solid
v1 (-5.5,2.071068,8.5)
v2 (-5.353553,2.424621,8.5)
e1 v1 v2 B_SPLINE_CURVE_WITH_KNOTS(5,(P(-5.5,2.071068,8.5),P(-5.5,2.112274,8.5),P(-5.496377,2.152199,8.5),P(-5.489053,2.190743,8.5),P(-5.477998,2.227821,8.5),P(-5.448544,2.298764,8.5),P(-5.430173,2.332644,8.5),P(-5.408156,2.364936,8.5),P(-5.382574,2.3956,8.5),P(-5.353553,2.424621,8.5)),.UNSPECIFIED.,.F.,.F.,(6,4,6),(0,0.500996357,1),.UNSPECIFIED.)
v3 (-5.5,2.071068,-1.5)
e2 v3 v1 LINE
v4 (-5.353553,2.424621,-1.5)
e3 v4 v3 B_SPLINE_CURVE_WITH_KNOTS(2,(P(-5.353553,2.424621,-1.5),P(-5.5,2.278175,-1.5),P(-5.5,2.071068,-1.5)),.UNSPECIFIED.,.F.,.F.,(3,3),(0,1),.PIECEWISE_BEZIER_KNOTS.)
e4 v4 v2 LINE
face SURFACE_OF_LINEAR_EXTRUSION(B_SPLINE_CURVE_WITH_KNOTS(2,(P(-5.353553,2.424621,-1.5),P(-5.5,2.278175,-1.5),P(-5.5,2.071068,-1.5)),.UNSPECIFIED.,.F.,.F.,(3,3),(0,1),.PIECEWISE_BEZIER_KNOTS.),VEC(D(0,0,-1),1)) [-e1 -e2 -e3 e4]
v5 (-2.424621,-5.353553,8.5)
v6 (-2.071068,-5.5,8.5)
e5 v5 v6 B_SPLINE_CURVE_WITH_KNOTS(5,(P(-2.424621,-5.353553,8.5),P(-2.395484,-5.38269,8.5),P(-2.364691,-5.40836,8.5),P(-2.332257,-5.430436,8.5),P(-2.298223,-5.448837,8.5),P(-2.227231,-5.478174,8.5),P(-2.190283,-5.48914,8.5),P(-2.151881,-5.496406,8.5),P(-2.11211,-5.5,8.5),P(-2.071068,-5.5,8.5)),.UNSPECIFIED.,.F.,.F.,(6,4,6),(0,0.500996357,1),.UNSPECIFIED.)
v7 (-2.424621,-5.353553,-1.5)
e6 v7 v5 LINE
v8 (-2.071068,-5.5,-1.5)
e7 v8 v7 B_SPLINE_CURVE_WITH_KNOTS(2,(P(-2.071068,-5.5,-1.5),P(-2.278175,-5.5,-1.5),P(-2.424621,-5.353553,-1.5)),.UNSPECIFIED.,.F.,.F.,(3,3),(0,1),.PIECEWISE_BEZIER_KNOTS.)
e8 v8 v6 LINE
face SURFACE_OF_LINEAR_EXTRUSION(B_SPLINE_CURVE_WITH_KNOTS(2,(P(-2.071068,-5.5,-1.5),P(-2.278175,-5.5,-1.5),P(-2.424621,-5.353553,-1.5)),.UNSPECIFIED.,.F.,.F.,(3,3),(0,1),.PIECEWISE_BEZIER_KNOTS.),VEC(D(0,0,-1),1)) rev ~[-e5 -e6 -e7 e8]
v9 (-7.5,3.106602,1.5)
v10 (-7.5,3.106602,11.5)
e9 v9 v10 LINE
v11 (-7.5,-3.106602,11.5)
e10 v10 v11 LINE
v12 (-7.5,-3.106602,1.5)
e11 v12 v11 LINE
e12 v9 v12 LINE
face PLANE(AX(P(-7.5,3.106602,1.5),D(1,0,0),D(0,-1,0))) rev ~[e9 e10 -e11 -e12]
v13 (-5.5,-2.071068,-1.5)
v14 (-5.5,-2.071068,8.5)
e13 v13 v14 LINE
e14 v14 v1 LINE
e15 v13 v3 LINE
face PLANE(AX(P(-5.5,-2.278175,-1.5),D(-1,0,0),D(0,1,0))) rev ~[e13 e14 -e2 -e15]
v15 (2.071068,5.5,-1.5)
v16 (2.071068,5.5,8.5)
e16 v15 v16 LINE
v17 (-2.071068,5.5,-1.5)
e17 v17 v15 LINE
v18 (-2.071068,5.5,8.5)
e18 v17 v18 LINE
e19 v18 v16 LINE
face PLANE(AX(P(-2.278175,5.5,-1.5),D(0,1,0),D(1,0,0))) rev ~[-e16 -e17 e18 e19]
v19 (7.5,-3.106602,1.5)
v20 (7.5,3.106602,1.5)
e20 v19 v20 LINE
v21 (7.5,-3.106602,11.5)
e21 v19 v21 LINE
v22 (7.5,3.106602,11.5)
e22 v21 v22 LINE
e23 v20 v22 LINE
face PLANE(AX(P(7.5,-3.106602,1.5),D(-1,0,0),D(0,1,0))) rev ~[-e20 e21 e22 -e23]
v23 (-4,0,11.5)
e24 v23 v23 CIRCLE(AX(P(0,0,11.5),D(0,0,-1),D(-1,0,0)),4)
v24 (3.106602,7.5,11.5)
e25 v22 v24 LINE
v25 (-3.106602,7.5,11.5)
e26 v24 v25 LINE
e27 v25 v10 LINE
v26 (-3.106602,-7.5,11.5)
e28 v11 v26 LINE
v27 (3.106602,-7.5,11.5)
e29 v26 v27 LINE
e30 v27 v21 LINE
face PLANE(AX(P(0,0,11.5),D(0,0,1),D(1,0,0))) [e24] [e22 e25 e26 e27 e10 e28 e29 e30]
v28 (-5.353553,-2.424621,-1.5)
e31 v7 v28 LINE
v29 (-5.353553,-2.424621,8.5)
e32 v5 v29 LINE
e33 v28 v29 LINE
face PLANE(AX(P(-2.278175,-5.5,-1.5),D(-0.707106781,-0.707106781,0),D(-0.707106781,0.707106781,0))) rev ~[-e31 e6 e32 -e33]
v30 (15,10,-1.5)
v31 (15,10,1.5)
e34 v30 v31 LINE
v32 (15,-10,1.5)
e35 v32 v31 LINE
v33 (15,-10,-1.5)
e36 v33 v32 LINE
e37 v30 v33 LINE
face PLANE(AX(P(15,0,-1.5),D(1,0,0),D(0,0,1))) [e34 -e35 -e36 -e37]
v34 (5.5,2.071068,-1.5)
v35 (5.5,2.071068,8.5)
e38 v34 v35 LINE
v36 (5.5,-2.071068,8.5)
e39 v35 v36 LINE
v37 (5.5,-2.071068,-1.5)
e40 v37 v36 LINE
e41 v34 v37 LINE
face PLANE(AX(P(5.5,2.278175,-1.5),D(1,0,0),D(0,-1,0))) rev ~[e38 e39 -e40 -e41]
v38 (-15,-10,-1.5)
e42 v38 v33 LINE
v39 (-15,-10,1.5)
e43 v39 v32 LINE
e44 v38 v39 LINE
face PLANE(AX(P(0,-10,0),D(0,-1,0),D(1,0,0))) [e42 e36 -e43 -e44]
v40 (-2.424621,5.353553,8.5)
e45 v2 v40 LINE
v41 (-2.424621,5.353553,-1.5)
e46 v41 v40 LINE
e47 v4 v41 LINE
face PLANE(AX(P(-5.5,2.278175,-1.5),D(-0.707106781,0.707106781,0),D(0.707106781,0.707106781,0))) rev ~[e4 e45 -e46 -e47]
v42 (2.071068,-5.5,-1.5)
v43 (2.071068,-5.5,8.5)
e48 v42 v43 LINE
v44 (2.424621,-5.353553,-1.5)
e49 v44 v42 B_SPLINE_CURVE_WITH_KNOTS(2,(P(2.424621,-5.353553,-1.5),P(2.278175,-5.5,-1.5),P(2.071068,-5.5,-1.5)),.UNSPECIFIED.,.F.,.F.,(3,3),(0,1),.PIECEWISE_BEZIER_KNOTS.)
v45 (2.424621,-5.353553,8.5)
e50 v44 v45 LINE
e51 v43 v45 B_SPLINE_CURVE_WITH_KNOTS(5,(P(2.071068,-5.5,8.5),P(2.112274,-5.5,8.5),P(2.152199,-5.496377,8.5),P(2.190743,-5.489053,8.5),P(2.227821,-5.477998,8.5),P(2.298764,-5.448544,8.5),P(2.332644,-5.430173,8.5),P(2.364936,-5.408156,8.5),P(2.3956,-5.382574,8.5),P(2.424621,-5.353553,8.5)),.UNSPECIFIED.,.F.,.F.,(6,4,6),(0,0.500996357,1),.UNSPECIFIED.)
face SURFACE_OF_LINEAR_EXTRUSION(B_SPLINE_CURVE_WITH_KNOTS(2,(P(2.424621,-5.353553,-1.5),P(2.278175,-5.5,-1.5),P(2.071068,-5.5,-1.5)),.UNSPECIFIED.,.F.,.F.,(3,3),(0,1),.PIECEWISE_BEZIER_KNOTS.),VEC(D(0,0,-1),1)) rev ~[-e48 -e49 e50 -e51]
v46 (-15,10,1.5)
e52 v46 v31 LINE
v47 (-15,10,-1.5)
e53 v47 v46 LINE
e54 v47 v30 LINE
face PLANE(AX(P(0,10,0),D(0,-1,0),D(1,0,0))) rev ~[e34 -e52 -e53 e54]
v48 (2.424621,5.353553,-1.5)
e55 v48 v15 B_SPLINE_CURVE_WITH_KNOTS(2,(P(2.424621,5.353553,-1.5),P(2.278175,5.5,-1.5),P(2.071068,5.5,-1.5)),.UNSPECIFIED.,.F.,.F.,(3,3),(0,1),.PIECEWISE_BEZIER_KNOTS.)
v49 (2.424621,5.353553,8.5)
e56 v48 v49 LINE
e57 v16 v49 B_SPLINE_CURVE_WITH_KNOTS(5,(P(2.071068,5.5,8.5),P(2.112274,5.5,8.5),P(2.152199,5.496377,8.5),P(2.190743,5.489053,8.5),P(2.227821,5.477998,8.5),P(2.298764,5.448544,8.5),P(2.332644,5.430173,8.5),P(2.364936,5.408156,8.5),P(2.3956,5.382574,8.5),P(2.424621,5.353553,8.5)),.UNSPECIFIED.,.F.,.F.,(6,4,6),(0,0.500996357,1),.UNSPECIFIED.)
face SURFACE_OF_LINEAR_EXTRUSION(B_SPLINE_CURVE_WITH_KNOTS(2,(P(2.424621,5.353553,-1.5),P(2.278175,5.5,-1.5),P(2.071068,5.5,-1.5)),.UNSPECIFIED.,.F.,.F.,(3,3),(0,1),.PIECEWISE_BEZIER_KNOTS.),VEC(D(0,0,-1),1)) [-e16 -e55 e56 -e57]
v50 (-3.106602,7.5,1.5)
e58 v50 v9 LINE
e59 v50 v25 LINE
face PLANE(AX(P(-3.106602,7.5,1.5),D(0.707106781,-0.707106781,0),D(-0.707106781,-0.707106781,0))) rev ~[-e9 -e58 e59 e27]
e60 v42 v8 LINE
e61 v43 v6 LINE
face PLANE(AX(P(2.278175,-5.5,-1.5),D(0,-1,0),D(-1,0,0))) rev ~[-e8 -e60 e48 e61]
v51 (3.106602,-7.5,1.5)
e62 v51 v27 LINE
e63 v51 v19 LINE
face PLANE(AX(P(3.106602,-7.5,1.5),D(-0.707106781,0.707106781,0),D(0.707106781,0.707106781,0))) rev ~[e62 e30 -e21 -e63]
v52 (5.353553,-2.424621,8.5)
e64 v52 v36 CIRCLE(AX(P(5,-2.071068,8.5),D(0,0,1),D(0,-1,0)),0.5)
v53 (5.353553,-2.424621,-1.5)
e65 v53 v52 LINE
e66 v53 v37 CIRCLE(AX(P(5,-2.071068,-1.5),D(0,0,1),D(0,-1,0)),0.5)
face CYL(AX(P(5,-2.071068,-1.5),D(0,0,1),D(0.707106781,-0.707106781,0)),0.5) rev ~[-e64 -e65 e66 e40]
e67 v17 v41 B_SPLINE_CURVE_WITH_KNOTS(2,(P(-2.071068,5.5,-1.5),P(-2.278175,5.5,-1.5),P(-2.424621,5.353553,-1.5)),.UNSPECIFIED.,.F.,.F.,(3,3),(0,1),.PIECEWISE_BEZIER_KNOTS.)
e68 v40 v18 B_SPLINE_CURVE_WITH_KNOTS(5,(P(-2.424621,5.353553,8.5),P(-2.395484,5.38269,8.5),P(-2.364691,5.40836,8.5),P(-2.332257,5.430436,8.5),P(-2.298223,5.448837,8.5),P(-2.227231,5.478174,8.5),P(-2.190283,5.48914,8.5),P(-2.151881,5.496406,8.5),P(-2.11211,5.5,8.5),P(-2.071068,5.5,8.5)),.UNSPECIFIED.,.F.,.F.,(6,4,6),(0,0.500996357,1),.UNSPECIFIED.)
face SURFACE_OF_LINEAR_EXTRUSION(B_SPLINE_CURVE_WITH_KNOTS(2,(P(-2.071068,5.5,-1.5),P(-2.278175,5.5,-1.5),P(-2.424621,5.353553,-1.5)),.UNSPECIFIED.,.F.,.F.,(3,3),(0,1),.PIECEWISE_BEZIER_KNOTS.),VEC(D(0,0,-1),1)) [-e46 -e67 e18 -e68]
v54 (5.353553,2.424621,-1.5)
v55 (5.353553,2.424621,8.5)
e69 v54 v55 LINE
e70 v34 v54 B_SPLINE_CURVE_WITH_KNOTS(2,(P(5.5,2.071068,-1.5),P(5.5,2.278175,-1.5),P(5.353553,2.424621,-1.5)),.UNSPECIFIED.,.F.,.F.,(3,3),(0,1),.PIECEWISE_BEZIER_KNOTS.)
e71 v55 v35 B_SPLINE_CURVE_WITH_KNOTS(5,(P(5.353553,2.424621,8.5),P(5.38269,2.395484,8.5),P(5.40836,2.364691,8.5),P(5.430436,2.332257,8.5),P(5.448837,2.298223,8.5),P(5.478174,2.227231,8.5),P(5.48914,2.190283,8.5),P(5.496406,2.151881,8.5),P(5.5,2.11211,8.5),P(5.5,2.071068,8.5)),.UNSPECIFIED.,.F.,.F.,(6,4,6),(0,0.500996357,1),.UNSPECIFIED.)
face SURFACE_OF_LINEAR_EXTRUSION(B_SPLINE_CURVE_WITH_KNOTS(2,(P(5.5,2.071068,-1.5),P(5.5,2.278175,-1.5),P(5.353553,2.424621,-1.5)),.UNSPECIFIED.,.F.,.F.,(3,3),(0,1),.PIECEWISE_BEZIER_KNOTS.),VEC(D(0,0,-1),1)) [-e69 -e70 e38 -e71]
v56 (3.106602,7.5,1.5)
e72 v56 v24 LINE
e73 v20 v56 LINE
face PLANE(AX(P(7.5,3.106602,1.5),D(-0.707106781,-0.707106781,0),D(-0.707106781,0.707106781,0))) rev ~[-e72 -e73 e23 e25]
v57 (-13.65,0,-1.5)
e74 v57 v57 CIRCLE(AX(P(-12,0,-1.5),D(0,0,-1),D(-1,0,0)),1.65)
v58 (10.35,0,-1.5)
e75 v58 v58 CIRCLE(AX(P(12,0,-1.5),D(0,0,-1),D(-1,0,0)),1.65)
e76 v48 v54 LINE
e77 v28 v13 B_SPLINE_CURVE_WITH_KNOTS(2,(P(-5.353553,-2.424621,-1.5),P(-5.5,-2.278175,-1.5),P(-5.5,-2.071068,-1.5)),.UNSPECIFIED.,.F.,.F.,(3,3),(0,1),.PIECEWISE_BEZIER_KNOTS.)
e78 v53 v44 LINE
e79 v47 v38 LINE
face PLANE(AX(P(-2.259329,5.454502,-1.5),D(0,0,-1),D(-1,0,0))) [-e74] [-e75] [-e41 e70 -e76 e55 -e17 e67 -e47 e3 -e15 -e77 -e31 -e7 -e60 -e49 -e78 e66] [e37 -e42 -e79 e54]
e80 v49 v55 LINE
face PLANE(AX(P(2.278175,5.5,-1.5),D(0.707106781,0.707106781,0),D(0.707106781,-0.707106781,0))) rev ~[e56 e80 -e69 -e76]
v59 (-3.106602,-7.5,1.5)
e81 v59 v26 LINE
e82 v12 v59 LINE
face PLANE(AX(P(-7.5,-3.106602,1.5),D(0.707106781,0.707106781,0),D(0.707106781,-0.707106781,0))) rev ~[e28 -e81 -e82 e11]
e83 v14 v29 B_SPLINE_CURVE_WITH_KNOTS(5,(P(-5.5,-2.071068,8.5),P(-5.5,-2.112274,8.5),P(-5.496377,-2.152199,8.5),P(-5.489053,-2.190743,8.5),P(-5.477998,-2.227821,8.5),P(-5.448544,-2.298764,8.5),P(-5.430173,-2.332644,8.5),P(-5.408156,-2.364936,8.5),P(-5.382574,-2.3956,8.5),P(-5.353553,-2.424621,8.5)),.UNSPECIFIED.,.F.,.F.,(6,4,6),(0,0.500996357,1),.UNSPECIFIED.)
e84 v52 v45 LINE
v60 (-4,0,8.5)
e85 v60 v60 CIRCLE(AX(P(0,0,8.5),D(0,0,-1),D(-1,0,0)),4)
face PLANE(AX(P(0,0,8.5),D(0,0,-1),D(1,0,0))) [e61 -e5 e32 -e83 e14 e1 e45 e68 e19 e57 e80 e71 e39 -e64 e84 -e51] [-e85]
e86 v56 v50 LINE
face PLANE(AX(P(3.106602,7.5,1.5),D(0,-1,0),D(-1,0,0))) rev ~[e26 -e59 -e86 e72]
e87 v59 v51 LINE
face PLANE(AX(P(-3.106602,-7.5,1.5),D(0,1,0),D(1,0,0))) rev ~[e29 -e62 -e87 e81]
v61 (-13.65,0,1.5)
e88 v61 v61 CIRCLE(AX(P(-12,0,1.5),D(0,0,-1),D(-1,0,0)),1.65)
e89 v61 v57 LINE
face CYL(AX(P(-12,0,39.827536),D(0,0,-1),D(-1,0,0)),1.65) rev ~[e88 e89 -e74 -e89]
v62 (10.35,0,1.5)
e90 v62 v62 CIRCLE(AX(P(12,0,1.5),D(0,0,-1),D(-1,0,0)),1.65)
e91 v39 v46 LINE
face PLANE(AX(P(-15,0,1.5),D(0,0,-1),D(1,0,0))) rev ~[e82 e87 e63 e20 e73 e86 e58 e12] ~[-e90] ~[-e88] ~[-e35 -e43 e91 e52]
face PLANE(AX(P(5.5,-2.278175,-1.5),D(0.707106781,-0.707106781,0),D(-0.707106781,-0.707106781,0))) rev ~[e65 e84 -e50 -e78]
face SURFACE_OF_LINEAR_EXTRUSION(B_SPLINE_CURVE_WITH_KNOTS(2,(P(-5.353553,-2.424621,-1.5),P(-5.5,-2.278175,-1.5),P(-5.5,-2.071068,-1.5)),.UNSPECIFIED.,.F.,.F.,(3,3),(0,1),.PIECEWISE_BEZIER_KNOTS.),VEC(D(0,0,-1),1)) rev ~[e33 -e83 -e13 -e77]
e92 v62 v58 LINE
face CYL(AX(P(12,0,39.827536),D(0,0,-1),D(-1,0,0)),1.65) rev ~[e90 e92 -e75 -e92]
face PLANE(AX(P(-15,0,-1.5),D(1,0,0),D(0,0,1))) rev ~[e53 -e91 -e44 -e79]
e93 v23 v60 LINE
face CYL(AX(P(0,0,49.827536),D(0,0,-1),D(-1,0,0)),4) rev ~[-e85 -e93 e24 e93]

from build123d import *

# Parameters (mm, degrees)
F0_W         = 30
F0_H         = 3
F1_DEPTH     = 10
F3_DEPTH     = 10
F5_DEPTH     = 10
F7_D         = 8
F8_T1_DEPTH  = 10.517766953
F9_R         = 0.5
F10_T1_DEPTH = 10.517766953
F11_T1_DEPTH = 10.517766953
F12_T1_DEPTH = 10.517766953
F13_T1_DEPTH = 10.517766953
F14_T1_DEPTH = 10.517766953
F15_T1_DEPTH = 10.517766953
F17_D        = 3.3


# Not quite as in the source:
# - a fillet or chamfer that OpenCascade refuses, or shapes differently, is made with other operations: its cross-section is extruded or revolved along the edge and cut away or added
# - a feature names something its author has since deleted; it is built from what else it names


with BuildPart() as f1:
    # F0 (on Front) → F1 (new body, symmetric)
    with BuildSketch(Plane.XZ):
        Rectangle(F0_W, F0_H)
    extrude(amount=F1_DEPTH, both=True)

    # F2 (on face) → F3 (join)
    with BuildSketch(Plane.XY.offset(1.5)):
        Polygon((-3.1066017178, -7.5), (3.1066017178, -7.5), (7.5, -3.1066017178), (7.5, 3.1066017178), (3.1066017178, 7.5), (-3.1066017178, 7.5), (-7.5, 3.1066017178), (-7.5, -3.1066017178), align=None)
    extrude(amount=F3_DEPTH)

    # F4 (on face) → F5 (cut)
    with BuildSketch(Plane(origin=(0, 0, -1.5), x_dir=(1, 0, 0), z_dir=(0, 0, -1))):
        Polygon((-2.2781745931, -5.5), (2.2781745931, -5.5), (5.5, -2.2781745931), (5.5, 2.2781745931), (2.2781745931, 5.5), (-2.2781745931, 5.5), (-5.5, 2.2781745931), (-5.5, -2.2781745931), align=None)
    extrude(amount=-F5_DEPTH, mode=Mode.SUBTRACT)

    # F7 (through all)
    with Locations(Plane.XY.offset(11.5)):
        with Locations((0, 0)):
            Hole(F7_D / 2)

    # F8: fillet of radius 0.5 on 1 edges, made by hand

    # F8_s2 → F8_t1 (join)
    with BuildSketch(Plane.XY.offset(-1.5)):
        with BuildLine():
            add(Edge.make_bspline(
                [(2.4246212025, -5.3535533906), (2.2781745931, -5.5), (2.0710678119, -5.5)],
                knots=[0, 0, 0, 1, 1, 1], degree=2, weights=[1, 1, 1]))
            Line((2.0710678119, -5.5), (2.2781745931, -5.5))
            Line((2.2781745931, -5.5), (2.4246212025, -5.3535533906))
        make_face()
    extrude(amount=F8_T1_DEPTH)

    # F9
    f9_edges = [f1.edges().sort_by_distance(p)[0] for p in [
        (5.5, -2.278175, 3.5),
    ]]
    fillet(f9_edges, radius=F9_R)

    # F10: fillet of radius 0.5 on 1 edges, made by hand

    # F10_s2 → F10_t1 (join)
    with BuildSketch(Plane.XY.offset(-1.5)):
        with BuildLine():
            add(Edge.make_bspline(
                [(-2.0710678119, -5.5), (-2.2781745931, -5.5), (-2.4246212025, -5.3535533906)],
                knots=[0, 0, 0, 1, 1, 1], degree=2, weights=[1, 1, 1]))
            Line((-2.4246212025, -5.3535533906), (-2.2781745931, -5.5))
            Line((-2.2781745931, -5.5), (-2.0710678119, -5.5))
        make_face()
    extrude(amount=F10_T1_DEPTH)

    # F11: fillet of radius 0.5 on 1 edges, made by hand

    # F11_s2 → F11_t1 (join)
    with BuildSketch(Plane.XY.offset(-1.5)):
        with BuildLine():
            add(Edge.make_bspline(
                [(-5.3535533906, -2.4246212025), (-5.5, -2.2781745931), (-5.5, -2.0710678119)],
                knots=[0, 0, 0, 1, 1, 1], degree=2, weights=[1, 1, 1]))
            Line((-5.5, -2.0710678119), (-5.5, -2.2781745931))
            Line((-5.5, -2.2781745931), (-5.3535533906, -2.4246212025))
        make_face()
    extrude(amount=F11_T1_DEPTH)

    # F12: fillet of radius 0.5 on 1 edges, made by hand

    # F12_s2 → F12_t1 (join)
    with BuildSketch(Plane.XY.offset(-1.5)):
        with BuildLine():
            add(Edge.make_bspline(
                [(-5.3535533906, 2.4246212025), (-5.5, 2.2781745931), (-5.5, 2.0710678119)],
                knots=[0, 0, 0, 1, 1, 1], degree=2, weights=[1, 1, 1]))
            Line((-5.5, 2.0710678119), (-5.5, 2.2781745931))
            Line((-5.5, 2.2781745931), (-5.3535533906, 2.4246212025))
        make_face()
    extrude(amount=F12_T1_DEPTH)

    # F13: fillet of radius 0.5 on 1 edges, made by hand

    # F13_s2 → F13_t1 (join)
    with BuildSketch(Plane.XY.offset(-1.5)):
        with BuildLine():
            add(Edge.make_bspline(
                [(5.5, 2.0710678119), (5.5, 2.2781745931), (5.3535533906, 2.4246212025)],
                knots=[0, 0, 0, 1, 1, 1], degree=2, weights=[1, 1, 1]))
            Line((5.3535533906, 2.4246212025), (5.5, 2.2781745931))
            Line((5.5, 2.2781745931), (5.5, 2.0710678119))
        make_face()
    extrude(amount=F13_T1_DEPTH)

    # F14: fillet of radius 0.5 on 1 edges, made by hand

    # F14_s2 → F14_t1 (join)
    with BuildSketch(Plane.XY.offset(-1.5)):
        with BuildLine():
            add(Edge.make_bspline(
                [(2.4246212025, 5.3535533906), (2.2781745931, 5.5), (2.0710678119, 5.5)],
                knots=[0, 0, 0, 1, 1, 1], degree=2, weights=[1, 1, 1]))
            Line((2.0710678119, 5.5), (2.2781745931, 5.5))
            Line((2.2781745931, 5.5), (2.4246212025, 5.3535533906))
        make_face()
    extrude(amount=F14_T1_DEPTH)

    # F15: fillet of radius 0.5 on 1 edges, made by hand

    # F15_s2 → F15_t1 (join)
    with BuildSketch(Plane.XY.offset(-1.5)):
        with BuildLine():
            add(Edge.make_bspline(
                [(-2.0710678119, 5.5), (-2.2781745931, 5.5), (-2.4246212025, 5.3535533906)],
                knots=[0, 0, 0, 1, 1, 1], degree=2, weights=[1, 1, 1]))
            Line((-2.4246212025, 5.3535533906), (-2.2781745931, 5.5))
            Line((-2.2781745931, 5.5), (-2.0710678119, 5.5))
        make_face()
    extrude(amount=F15_T1_DEPTH)

    # F17 (through all)
    with Locations(Plane.XY.offset(1.5)):
        with Locations((-12, 0), (12, 0)):
            Hole(F17_D / 2)


solid = f1.part
